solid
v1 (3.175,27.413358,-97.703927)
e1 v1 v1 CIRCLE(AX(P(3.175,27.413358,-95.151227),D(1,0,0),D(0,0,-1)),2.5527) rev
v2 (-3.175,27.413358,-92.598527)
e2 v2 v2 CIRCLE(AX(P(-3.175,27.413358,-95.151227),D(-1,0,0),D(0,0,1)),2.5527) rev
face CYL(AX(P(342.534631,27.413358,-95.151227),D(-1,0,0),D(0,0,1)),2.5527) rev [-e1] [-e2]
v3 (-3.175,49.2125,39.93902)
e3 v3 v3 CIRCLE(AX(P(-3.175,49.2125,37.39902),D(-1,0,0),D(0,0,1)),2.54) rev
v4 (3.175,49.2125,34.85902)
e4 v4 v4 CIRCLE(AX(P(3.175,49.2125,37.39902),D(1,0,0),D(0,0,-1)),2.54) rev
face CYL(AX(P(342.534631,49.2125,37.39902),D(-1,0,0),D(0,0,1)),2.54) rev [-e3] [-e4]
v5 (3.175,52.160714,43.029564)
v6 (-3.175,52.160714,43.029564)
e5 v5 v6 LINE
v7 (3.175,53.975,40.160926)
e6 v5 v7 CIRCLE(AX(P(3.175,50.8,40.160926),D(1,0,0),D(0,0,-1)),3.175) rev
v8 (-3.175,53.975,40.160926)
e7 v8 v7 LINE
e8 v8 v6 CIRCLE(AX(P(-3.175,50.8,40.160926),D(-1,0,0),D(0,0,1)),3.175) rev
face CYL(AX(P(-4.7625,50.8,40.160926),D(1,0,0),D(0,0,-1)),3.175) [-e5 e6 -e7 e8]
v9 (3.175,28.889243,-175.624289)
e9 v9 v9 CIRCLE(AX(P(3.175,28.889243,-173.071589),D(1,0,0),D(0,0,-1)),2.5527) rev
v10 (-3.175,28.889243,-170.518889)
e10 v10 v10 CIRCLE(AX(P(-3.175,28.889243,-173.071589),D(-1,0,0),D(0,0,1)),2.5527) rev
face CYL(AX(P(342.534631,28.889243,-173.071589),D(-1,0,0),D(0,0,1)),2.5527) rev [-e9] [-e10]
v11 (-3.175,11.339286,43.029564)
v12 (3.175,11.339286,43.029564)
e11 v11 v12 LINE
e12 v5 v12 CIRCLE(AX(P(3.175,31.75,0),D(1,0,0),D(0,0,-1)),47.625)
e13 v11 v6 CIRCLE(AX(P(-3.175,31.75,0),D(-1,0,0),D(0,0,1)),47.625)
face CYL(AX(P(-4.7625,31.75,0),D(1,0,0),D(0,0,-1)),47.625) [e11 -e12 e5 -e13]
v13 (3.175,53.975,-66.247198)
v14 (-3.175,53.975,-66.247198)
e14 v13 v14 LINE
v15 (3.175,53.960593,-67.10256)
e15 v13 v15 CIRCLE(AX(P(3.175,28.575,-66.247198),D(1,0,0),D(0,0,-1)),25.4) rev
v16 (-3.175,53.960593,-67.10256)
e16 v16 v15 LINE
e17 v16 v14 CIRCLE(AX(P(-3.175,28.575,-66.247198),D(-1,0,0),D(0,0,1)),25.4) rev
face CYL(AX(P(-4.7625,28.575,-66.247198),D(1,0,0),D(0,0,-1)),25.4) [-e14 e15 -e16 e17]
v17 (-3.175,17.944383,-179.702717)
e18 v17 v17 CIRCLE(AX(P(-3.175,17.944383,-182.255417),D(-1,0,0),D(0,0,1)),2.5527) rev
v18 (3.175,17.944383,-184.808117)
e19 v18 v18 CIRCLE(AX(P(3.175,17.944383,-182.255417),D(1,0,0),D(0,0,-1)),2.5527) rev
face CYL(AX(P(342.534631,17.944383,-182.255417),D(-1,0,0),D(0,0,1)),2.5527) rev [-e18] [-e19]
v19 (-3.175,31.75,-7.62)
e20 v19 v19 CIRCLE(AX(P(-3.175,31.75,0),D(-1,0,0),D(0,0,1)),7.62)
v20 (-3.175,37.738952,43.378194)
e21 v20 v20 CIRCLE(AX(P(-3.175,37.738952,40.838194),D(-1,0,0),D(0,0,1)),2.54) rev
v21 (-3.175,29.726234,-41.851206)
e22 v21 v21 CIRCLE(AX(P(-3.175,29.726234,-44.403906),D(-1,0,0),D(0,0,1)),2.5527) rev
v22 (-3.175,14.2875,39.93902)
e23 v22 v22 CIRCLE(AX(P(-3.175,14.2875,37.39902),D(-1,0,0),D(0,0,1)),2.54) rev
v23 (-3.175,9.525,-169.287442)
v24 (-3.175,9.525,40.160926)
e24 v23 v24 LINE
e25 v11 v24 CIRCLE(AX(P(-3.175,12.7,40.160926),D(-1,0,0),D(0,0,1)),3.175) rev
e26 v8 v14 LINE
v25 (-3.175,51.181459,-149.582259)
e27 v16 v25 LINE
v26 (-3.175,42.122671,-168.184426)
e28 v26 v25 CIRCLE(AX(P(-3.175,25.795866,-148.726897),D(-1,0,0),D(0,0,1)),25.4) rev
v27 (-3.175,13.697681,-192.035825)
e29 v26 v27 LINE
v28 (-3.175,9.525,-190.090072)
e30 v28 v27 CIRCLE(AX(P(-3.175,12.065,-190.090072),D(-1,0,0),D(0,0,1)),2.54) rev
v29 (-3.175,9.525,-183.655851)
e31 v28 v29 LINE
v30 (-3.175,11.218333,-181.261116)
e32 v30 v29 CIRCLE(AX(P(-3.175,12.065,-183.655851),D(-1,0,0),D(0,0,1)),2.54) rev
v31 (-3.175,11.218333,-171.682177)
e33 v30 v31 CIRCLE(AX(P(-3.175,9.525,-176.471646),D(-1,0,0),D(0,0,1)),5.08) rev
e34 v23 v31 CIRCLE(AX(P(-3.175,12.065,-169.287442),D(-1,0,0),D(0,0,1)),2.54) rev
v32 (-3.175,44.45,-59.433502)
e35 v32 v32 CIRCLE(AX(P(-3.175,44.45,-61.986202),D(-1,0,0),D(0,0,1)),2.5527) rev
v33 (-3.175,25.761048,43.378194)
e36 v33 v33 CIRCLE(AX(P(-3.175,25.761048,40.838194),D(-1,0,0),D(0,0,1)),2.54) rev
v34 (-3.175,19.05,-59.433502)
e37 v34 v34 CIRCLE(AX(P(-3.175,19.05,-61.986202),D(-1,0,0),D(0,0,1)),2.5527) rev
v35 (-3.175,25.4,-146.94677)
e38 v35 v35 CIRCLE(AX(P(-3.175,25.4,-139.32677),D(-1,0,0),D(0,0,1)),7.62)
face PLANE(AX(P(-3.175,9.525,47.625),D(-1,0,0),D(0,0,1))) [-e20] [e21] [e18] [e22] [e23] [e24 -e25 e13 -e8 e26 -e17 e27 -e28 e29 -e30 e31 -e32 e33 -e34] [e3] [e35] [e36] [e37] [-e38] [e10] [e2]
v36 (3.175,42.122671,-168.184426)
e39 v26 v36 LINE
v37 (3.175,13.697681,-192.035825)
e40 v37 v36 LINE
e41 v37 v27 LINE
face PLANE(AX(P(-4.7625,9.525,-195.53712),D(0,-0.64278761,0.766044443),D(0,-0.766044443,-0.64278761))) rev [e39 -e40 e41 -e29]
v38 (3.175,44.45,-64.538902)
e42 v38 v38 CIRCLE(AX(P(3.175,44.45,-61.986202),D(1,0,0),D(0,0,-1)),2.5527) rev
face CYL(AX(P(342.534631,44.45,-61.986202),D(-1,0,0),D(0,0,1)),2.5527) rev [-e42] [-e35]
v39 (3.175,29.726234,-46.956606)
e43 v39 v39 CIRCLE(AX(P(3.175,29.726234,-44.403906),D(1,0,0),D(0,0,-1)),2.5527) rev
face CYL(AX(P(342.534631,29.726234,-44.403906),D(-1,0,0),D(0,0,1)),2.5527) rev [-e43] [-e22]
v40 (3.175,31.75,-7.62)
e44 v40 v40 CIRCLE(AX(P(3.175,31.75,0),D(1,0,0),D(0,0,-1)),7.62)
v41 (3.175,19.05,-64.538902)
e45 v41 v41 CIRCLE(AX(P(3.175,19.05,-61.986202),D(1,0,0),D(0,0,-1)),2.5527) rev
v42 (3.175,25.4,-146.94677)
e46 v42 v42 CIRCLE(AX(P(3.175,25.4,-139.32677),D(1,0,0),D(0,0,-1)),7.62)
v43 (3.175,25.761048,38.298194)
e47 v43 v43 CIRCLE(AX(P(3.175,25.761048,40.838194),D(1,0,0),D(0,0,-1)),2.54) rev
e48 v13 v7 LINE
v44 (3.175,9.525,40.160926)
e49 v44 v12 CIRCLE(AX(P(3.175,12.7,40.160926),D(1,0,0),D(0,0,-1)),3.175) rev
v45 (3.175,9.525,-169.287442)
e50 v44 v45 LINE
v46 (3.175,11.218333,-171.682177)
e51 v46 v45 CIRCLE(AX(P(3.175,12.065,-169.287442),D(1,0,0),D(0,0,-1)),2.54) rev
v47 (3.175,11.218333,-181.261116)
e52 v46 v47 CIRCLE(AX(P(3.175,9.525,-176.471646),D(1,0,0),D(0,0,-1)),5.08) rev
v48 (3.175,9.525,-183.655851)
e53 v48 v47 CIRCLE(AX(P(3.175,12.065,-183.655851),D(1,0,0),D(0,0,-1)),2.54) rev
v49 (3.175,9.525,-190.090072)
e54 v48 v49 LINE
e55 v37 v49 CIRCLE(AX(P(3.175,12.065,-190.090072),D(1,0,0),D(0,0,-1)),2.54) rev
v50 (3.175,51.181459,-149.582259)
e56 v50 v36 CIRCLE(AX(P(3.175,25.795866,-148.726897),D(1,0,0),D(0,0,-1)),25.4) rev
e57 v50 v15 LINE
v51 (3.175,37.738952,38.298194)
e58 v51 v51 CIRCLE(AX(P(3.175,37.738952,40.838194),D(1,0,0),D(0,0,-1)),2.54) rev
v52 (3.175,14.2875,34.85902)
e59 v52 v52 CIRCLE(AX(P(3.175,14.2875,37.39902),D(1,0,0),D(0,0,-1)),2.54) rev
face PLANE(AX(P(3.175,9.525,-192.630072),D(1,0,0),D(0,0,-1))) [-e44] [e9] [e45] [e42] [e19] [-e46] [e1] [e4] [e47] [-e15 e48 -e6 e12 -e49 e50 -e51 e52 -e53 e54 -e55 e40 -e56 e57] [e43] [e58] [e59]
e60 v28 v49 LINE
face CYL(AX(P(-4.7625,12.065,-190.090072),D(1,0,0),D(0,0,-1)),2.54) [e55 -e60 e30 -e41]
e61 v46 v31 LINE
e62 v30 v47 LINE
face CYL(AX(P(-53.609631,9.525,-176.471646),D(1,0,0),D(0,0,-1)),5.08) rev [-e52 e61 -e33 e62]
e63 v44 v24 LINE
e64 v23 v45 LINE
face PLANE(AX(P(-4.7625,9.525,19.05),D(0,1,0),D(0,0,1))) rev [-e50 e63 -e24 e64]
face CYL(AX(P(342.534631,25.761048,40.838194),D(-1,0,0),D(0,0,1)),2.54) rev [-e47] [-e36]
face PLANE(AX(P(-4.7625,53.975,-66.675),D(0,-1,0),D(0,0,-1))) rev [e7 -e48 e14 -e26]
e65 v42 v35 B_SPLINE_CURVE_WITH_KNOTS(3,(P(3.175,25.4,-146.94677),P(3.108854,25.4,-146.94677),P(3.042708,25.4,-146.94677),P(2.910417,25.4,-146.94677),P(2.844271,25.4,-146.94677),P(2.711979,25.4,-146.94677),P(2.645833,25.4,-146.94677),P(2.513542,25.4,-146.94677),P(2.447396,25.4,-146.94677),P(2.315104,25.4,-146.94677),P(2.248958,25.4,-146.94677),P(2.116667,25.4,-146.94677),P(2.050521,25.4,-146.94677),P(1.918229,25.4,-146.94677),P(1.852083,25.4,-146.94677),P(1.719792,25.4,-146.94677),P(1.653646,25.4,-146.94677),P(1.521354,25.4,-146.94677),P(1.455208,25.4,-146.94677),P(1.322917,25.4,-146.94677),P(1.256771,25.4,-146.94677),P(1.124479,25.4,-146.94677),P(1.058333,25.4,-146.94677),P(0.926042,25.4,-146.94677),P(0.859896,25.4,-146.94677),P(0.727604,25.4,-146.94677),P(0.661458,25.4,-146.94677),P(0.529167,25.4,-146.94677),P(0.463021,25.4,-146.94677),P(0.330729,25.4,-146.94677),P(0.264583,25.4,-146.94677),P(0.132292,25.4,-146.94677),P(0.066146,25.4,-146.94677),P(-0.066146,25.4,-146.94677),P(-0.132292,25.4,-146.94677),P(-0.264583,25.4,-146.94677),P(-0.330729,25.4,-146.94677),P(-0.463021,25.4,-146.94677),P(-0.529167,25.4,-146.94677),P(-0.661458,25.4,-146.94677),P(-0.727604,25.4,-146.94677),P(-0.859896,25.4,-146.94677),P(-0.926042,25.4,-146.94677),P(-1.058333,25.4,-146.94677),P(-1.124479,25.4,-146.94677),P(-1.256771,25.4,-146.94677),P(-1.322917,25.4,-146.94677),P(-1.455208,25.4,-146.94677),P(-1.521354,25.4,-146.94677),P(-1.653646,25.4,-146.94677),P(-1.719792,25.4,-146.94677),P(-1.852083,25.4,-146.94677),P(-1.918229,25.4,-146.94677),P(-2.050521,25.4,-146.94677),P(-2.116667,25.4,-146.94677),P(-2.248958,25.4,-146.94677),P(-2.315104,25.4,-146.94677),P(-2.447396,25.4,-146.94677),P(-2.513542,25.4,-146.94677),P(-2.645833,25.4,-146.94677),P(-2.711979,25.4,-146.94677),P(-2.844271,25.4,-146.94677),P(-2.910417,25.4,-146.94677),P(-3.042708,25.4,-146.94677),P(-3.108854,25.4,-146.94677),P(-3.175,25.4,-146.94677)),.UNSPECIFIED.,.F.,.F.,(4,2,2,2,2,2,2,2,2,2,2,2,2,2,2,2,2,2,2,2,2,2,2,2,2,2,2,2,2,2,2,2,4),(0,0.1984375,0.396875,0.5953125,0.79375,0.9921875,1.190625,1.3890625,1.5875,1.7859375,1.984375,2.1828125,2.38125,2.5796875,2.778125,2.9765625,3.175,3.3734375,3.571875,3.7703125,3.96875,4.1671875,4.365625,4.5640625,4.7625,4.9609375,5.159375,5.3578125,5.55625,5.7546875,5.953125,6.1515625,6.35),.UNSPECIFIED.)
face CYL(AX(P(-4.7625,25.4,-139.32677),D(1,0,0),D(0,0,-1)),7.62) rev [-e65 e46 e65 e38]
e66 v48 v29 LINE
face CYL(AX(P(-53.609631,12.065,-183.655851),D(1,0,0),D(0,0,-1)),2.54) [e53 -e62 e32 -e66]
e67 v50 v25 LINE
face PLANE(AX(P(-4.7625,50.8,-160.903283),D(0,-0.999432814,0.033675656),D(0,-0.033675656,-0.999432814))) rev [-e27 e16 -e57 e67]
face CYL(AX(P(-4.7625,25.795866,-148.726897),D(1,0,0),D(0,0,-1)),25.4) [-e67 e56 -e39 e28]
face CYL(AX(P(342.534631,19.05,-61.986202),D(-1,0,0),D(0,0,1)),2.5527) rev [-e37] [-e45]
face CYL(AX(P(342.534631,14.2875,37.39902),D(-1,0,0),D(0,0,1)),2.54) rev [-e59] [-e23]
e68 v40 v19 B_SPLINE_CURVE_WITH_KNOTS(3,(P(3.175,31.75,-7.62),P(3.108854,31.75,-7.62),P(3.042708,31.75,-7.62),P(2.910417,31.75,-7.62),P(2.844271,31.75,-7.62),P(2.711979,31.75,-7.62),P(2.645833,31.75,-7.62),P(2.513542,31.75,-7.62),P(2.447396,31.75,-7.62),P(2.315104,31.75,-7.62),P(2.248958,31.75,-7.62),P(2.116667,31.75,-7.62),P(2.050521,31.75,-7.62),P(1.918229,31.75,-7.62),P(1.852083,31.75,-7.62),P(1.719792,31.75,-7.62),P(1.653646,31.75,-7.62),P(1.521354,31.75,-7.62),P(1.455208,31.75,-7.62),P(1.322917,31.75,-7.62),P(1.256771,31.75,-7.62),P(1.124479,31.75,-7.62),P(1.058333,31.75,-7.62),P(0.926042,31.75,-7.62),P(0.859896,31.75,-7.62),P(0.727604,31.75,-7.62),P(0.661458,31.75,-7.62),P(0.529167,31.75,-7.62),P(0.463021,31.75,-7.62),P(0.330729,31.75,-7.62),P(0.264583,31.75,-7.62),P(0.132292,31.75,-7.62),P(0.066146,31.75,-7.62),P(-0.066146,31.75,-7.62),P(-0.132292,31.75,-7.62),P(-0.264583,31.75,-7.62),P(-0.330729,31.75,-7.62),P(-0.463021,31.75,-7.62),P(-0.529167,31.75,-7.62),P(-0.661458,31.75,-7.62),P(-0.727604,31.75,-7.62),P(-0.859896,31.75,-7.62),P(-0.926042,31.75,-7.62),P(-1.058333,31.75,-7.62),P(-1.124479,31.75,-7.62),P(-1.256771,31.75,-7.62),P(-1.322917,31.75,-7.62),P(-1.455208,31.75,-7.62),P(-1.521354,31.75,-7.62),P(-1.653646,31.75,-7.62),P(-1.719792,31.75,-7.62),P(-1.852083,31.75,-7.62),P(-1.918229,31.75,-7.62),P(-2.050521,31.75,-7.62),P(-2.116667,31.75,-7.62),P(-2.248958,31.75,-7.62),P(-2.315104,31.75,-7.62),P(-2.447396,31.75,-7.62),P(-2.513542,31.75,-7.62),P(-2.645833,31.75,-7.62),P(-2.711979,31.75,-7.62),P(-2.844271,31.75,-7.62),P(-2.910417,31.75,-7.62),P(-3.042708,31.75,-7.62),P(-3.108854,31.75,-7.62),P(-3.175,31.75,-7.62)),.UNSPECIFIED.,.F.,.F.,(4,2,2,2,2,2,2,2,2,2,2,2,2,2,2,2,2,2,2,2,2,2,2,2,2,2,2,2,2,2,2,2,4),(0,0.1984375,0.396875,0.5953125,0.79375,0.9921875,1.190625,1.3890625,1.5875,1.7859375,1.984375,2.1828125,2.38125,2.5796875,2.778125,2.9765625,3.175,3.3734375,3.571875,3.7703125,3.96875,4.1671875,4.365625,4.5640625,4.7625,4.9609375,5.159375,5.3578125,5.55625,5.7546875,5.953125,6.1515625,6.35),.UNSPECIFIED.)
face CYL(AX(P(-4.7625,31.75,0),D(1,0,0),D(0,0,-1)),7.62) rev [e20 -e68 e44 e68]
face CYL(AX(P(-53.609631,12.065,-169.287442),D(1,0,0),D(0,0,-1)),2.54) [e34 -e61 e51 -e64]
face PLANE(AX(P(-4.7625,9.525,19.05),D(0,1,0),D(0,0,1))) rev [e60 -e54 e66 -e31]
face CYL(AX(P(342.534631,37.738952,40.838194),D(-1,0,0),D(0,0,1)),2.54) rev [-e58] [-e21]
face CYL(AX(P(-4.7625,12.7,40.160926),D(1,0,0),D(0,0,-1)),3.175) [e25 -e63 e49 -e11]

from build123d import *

# Parameters (mm, degrees)
STOCK_HAMMERSAW_START                   = -149.225
STOCK_HAMMERSAW_MULTIBODY_1_OUTLINE_R   = 2.5527
STOCK_HAMMERSAW_MULTIBODY_1_OUTLINE_R_2 = 7.62
STOCK_HAMMERSAW_MULTIBODY_1_OUTLINE_R_3 = 2.54
STOCK_HAMMERSAW_MULTIBODY_1_DEPTH       = 9.525
FILLET1_R                               = 2.54
FILLET2_R                               = 3.175
FILLET3_R                               = 25.4
FILLET4_R                               = 2.54
CUT_EXTRUDE1_DEPTH                      = 201.10578904
CUT_EXTRUDE1_DEPTH_BACK                 = 201.10578904
SKETCH1_W                               = 1.5875
SKETCH1_H                               = 240.255072357


with BuildPart() as part:
    # Stock-HammerSaw Multibody-1: read off the stored shape, not the designer's step
    # Stock-HammerSaw Multibody-1 outline → Stock-HammerSaw Multibody-1 (new body)
    with BuildSketch(Plane.YZ.offset(STOCK_HAMMERSAW_START)):
        with BuildLine():
            Line((9.525, 42.121134838), (9.525, -171.391646474))
            ThreePointArc((9.525, -171.391646474), (14.605, -176.471646474), (9.525, -181.551646474))
            Line((9.525, -181.551646474), (9.525, -195.537119935))
            Line((9.525, -195.537119935), (50.8, -160.903282658))
            Line((50.8, -160.903282658), (53.975, -66.675))
            Line((53.975, -66.675), (53.975, 42.121134838))
            ThreePointArc((53.975, 42.121134838), (31.75, 47.625), (9.525, 42.121134838))
        make_face()
        with Locations((17.944382949, -182.255416592)):
            Circle(STOCK_HAMMERSAW_MULTIBODY_1_OUTLINE_R, mode=Mode.SUBTRACT)
        with Locations((28.88924293, -173.071588618)):
            Circle(STOCK_HAMMERSAW_MULTIBODY_1_OUTLINE_R, mode=Mode.SUBTRACT)
        with Locations((25.4, -139.326770285)):
            Circle(STOCK_HAMMERSAW_MULTIBODY_1_OUTLINE_R_2, mode=Mode.SUBTRACT)
        with Locations((27.413358223, -95.151227202)):
            Circle(STOCK_HAMMERSAW_MULTIBODY_1_OUTLINE_R, mode=Mode.SUBTRACT)
        with Locations((19.05, -61.986201926)):
            Circle(STOCK_HAMMERSAW_MULTIBODY_1_OUTLINE_R, mode=Mode.SUBTRACT)
        with Locations((29.726233837, -44.403906028)):
            Circle(STOCK_HAMMERSAW_MULTIBODY_1_OUTLINE_R, mode=Mode.SUBTRACT)
        with Locations((14.2875, 37.399020291)):
            Circle(STOCK_HAMMERSAW_MULTIBODY_1_OUTLINE_R_3, mode=Mode.SUBTRACT)
        with Locations((25.761047521, 40.838193804)):
            Circle(STOCK_HAMMERSAW_MULTIBODY_1_OUTLINE_R_3, mode=Mode.SUBTRACT)
        with Locations((44.45, -61.986201926)):
            Circle(STOCK_HAMMERSAW_MULTIBODY_1_OUTLINE_R, mode=Mode.SUBTRACT)
        with Locations((31.75, 0)):
            Circle(STOCK_HAMMERSAW_MULTIBODY_1_OUTLINE_R_2, mode=Mode.SUBTRACT)
        with Locations((37.738952479, 40.838193804)):
            Circle(STOCK_HAMMERSAW_MULTIBODY_1_OUTLINE_R_3, mode=Mode.SUBTRACT)
        with Locations((49.2125, 37.399020291)):
            Circle(STOCK_HAMMERSAW_MULTIBODY_1_OUTLINE_R_3, mode=Mode.SUBTRACT)
    extrude(amount=STOCK_HAMMERSAW_MULTIBODY_1_DEPTH)


with BuildPart() as part_1:
    # Body-Move/Copy2: read off the stored shape, not the designer's step
    # Body-Move/Copy2: moved
    add(part.part.moved(Location((144.4625, 0, 0))))

    # Fillet1
    fillet1_edges = [part_1.edges().sort_by_distance(p)[0] for p in [
        (0, 9.525, -195.537119935),
    ]]
    fillet(fillet1_edges, radius=FILLET1_R)

    # Fillet2
    fillet2_edges = [part_1.edges().sort_by_distance(p)[0] for p in [
        (0, 53.975, 42.121134838),
        (0, 9.525, 42.121134838),
    ]]
    fillet(fillet2_edges, radius=FILLET2_R)

    # Fillet3
    # the kernel refuses this fillet: 25.4 mm, written as the material it takes off along each edge
    with BuildSketch(Plane(origin=(-33.08112114, 50.8, -160.903282658), x_dir=(0, -0.7660444431175363, -0.6427876096882575), z_dir=(1, 0, 0))) as fillet3_piece_1:
        with BuildLine():
            CenterArc((FILLET3_R * 0.445962537632, -FILLET3_R), FILLET3_R, 90, 48.070162195)
            Line((-FILLET3_R * 0.2980011219, -FILLET3_R * 0.33177992151), (0, 0))
            Line((0, 0), (FILLET3_R * 0.445962537632, 0))
        make_face()
    extrude(amount=66.162242279, mode=Mode.SUBTRACT)
    with BuildSketch(Plane(origin=(-5.832005366, 53.975, -66.675), x_dir=(0, 0, 1), z_dir=(1, 0, 0))) as fillet3_piece_2:
        with BuildLine():
            CenterArc((FILLET3_R * 0.0168426041932, FILLET3_R), FILLET3_R, 268.070162195, 1.929837805)
            Line((-FILLET3_R * 0.0168330513083, FILLET3_R * 0.000567185736557), (0, 0))
            Line((0, 0), (FILLET3_R * 0.0168426041932, 0))
        make_face()
    extrude(amount=11.664010733, mode=Mode.SUBTRACT)

    # Fillet4
    fillet4_edges = [part_1.edges().sort_by_distance(p)[0] for p in [
        (0, 9.525, -181.551646474),
        (0, 9.525, -171.391646474),
    ]]
    fillet(fillet4_edges, radius=FILLET4_R)

    # Sketch1 → Cut-Extrude1 (cut, two sides: drawn at the far end of the back side and taken through both)
    with BuildSketch(Plane(origin=(0, 0, 0), x_dir=(1, 0, 0), z_dir=(0, 1, 0)).offset(-CUT_EXTRUDE1_DEPTH_BACK)):
        with Locations((-3.96875, 72.502536179)):
            Rectangle(SKETCH1_W, SKETCH1_H)
        with Locations((3.96875, 72.502536179)):
            Rectangle(SKETCH1_W, SKETCH1_H)
    extrude(amount=CUT_EXTRUDE1_DEPTH + CUT_EXTRUDE1_DEPTH_BACK, mode=Mode.SUBTRACT)


solid = part_1.part
